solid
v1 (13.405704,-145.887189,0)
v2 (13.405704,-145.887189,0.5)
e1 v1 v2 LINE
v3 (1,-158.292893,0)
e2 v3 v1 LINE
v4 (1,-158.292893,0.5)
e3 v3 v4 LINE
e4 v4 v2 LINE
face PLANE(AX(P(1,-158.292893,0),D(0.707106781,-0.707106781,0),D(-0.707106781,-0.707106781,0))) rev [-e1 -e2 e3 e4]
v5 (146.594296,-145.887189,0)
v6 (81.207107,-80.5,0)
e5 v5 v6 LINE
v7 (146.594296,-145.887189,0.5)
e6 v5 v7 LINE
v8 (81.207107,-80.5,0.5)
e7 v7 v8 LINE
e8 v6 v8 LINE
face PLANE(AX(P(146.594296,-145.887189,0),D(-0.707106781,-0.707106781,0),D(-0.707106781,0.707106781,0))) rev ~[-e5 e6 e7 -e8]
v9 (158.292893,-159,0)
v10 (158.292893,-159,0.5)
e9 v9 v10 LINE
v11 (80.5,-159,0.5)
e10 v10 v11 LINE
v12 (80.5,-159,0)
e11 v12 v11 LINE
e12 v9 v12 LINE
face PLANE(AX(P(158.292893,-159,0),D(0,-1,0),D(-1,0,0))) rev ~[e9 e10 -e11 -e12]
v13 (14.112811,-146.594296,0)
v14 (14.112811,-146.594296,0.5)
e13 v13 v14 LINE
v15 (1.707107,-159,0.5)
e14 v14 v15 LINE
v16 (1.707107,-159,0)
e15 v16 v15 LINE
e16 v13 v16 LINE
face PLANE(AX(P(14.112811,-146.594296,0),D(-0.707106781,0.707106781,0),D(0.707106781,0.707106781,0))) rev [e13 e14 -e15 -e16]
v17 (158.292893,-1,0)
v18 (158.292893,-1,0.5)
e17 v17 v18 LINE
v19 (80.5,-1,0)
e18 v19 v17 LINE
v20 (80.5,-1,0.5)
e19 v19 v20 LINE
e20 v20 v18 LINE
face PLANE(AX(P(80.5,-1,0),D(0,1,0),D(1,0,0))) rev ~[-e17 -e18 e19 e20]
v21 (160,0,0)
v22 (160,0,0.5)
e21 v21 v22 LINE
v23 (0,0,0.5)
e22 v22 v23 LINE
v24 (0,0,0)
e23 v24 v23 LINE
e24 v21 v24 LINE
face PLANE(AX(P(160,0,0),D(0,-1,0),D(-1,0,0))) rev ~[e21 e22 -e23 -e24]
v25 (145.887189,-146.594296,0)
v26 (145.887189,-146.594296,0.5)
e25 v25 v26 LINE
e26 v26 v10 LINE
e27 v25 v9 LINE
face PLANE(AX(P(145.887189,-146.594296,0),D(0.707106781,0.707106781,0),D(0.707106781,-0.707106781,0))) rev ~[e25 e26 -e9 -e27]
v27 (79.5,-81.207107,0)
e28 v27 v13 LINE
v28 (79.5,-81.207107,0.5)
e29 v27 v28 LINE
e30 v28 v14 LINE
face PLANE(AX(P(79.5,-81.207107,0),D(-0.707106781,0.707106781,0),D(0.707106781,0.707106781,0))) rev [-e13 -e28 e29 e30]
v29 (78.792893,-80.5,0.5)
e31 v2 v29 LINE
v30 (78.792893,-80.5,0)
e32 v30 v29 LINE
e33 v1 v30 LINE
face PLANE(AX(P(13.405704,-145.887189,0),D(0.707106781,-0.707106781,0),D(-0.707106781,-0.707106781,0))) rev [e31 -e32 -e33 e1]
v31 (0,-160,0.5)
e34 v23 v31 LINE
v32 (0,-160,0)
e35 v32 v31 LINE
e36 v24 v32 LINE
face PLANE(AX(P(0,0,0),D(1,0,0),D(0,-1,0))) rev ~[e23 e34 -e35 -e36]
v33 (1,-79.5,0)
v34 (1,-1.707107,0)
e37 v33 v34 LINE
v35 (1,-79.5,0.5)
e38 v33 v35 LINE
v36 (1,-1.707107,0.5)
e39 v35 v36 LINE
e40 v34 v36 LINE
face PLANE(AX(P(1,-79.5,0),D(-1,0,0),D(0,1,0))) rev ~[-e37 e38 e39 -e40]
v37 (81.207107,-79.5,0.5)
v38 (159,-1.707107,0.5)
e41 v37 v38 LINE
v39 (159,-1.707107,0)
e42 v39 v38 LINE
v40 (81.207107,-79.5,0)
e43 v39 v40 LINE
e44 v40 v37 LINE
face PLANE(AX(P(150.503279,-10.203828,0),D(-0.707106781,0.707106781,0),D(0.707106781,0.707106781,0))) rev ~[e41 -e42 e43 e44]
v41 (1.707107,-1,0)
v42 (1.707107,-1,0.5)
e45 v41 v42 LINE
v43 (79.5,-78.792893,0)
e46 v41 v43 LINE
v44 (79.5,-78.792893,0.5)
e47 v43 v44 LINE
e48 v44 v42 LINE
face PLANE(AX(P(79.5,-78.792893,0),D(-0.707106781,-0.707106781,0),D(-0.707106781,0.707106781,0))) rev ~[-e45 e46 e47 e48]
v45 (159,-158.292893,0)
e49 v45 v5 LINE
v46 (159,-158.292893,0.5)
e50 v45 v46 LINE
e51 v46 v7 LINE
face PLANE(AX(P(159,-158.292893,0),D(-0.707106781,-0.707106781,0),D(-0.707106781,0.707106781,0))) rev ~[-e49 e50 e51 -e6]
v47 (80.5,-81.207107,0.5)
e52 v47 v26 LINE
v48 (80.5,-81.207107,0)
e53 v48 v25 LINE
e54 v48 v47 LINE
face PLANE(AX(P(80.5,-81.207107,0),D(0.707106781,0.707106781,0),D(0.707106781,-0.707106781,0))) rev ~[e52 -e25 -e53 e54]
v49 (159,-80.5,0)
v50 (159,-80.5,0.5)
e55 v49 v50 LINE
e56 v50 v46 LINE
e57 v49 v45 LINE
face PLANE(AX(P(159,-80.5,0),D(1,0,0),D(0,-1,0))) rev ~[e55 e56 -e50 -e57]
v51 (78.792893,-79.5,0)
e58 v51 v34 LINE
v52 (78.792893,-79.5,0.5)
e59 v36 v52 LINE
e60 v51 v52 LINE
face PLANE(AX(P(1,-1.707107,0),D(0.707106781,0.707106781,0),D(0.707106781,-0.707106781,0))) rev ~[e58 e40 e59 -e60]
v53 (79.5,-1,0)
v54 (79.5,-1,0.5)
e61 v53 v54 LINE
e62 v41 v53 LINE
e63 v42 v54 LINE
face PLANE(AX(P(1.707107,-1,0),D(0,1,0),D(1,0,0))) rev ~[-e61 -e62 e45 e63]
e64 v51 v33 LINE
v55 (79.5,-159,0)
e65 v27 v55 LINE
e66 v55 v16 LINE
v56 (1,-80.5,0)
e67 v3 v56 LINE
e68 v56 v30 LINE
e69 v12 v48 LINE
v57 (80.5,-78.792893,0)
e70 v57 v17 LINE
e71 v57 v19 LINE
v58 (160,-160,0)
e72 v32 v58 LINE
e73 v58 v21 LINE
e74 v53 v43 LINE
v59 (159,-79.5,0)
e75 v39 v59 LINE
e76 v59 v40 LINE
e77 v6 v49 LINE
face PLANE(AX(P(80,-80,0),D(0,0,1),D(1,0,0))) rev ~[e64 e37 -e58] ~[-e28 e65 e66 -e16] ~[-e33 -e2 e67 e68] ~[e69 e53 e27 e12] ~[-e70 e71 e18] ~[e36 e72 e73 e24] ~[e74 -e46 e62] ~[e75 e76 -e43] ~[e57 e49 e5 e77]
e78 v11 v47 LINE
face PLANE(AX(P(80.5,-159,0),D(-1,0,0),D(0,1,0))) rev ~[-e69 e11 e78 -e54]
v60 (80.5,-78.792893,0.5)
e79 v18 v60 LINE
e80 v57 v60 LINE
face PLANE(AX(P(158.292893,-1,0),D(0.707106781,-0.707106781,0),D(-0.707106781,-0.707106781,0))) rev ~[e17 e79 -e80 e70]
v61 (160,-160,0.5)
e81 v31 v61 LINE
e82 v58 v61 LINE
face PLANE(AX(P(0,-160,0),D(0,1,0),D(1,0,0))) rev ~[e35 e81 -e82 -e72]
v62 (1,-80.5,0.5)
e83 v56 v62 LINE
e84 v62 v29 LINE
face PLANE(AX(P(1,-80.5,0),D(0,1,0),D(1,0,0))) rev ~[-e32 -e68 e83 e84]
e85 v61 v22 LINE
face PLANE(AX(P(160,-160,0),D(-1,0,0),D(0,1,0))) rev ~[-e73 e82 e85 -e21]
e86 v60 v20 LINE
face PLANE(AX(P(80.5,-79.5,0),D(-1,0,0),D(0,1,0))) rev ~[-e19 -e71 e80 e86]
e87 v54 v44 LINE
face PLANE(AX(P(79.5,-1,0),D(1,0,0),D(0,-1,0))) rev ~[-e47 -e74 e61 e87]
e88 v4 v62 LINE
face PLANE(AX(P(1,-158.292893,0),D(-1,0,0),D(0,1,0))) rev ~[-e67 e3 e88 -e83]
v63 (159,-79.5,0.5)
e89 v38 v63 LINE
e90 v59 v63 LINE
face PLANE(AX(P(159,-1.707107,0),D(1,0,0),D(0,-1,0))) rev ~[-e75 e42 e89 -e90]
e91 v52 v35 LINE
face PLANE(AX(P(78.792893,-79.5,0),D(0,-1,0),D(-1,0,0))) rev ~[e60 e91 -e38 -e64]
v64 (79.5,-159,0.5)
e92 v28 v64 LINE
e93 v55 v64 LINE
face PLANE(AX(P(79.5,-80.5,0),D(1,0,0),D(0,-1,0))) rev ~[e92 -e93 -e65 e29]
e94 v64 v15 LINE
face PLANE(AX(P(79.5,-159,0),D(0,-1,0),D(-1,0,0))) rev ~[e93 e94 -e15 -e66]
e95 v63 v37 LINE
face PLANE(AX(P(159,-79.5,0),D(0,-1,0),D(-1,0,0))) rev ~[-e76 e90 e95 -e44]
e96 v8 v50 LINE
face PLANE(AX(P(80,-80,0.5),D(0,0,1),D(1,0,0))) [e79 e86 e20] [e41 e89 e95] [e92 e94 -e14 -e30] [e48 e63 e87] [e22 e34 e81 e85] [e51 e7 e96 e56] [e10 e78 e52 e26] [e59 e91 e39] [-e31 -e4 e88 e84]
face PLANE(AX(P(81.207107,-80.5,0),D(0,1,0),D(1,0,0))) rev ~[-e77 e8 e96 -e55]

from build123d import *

# Parameters (mm, degrees)
F1_DEPTH = 0.5


# Not quite as in the source:
# - a pattern or mirror of a feature is missing from the dataset's text; its kind, count and spacing are read off the source's solid


with BuildPart() as f1:
    # F0 (on Top) → F1 (new body)
    with BuildSketch(Plane.XY):
        Polygon((160, 0), (0, 0), (0, -1), (0, -160), (160, -160), align=None)
        Polygon((1, -1.7071067812), (1, -1), (1.7071067812, -1), (79.5, -1), (80, -1), (80.5, -1), (158.2928932188, -1), (159, -1), (159, -1.7071067812), (159, -79.5), (159, -80.5), (159, -158.2928932188), (159, -159), (158.2928932188, -159), (80.5, -159), (80, -159), (79.5, -159), (1.7071067812, -159), (1, -159), (1, -158.2928932188), (1, -80.5), (1, -80), (1, -79.5), align=None, mode=Mode.SUBTRACT)
        Polygon((78.7928932188, -79.5), (1, -79.5), (1, -80), (1, -80.5), (78.7928932188, -80.5), (79.2928932188, -80), align=None)
        Polygon((159, -79.5), (81.2071067812, -79.5), (80.7071067812, -80), (81.2071067812, -80.5), (159, -80.5), align=None)
        Polygon((79.5, -78.7928932188), (1.7071067812, -1), (1.3535533906, -1.3535533906), (79.5, -79.5), align=None)
        Polygon((1.3535533906, -1.3535533906), (1, -1.7071067812), (78.7928932188, -79.5), (79.5, -79.5), align=None)
        Polygon((146.2407427602, -146.2407427602), (80.5, -80.5), (80.5, -81.2071067812), (145.8871893697, -146.5942961508), align=None)
        Polygon((81.2071067812, -80.5), (80.5, -80.5), (146.2407427602, -146.2407427602), (146.5942961508, -145.8871893697), align=None)
        Polygon((80, -1), (79.5, -1), (79.5, -78.7928932188), (80, -79.2928932188), align=None)
        Polygon((80.5, -1), (80, -1), (80, -79.2928932188), (80.5, -78.7928932188), align=None)
        Polygon((80, -80.7071067812), (79.5, -81.2071067812), (79.5, -159), (80, -159), align=None)
        Polygon((80.5, -81.2071067812), (80, -80.7071067812), (80, -159), (80.5, -159), align=None)
        Polygon((146.5942961508, -145.8871893697), (146.2407427602, -146.2407427602), (158.6464466094, -158.6464466094), (159, -158.2928932188), align=None)
        Polygon((158.6464466094, -158.6464466094), (146.2407427602, -146.2407427602), (145.8871893697, -146.5942961508), (158.2928932188, -159), align=None)
        Polygon((159, -1), (158.2928932188, -1), (149.7961722435, -9.4967209753), (150.1497256341, -9.8502743659), align=None)
        Polygon((159, -1.7071067812), (159, -1), (150.1497256341, -9.8502743659), (150.5032790247, -10.2038277565), align=None)
        Polygon((80, -79.2928932188), (79.5, -78.7928932188), (79.5, -79.5), (79.7928932188, -79.5), align=None)
        Polygon((79.5, -79.5), (78.7928932188, -79.5), (79.2928932188, -80), (79.5, -79.7928932188), align=None)
        Polygon((80.5, -78.7928932188), (80, -79.2928932188), (80.2071067812, -79.5), (80.5, -79.5), align=None)
        Polygon((79.5, -80.2071067812), (79.2928932188, -80), (78.7928932188, -80.5), (79.5, -80.5), align=None)
        Polygon((80, -80), (79.6464466094, -79.6464466094), (79.5, -79.7928932188), (79.5, -80.2071067812), (79.6464466094, -80.3535533906), align=None)
        Polygon((80.3535533906, -79.6464466094), (80, -80), (80.3535533906, -80.3535533906), (80.5, -80.2071067812), (80.5, -79.7928932188), align=None)
        Polygon((81.2071067812, -79.5), (80.5, -79.5), (80.5, -79.7928932188), (80.7071067812, -80), align=None)
        Polygon((79.7928932188, -80.5), (79.5, -80.5), (79.5, -81.2071067812), (80, -80.7071067812), align=None)
        Polygon((80.5, -80.5), (80.2071067812, -80.5), (80, -80.7071067812), (80.5, -81.2071067812), align=None)
        Polygon((80.7071067812, -80), (80.5, -80.2071067812), (80.5, -80.5), (81.2071067812, -80.5), align=None)
        Polygon((1.7071067812, -1), (1, -1), (1.3535533906, -1.3535533906), align=None)
        Polygon((1.3535533906, -1.3535533906), (1, -1), (1, -1.7071067812), align=None)
        Polygon((1.3535533906, -158.6464466094), (1, -158.2928932188), (1, -159), align=None)
        Polygon((1.3535533906, -158.6464466094), (1, -159), (1.7071067812, -159), align=None)
        Polygon((159, -158.2928932188), (158.6464466094, -158.6464466094), (159, -159), align=None)
        Polygon((159, -159), (158.6464466094, -158.6464466094), (158.2928932188, -159), align=None)
        Polygon((80, -79.5), (79.7928932188, -79.5), (79.6464466094, -79.6464466094), (80, -80), align=None)
        Polygon((80.2071067812, -79.5), (80, -79.5), (80, -80), (80.3535533906, -79.6464466094), align=None)
        Polygon((80.3535533906, -80.3535533906), (80, -80), (80, -80.5), (80.2071067812, -80.5), align=None)
        Polygon((80, -80.5), (80, -80), (79.6464466094, -80.3535533906), (79.7928932188, -80.5), align=None)
        Polygon((79.5, -79.7928932188), (79.2928932188, -80), (79.5, -80.2071067812), align=None)
        Polygon((80.7071067812, -80), (80.5, -79.7928932188), (80.5, -80.2071067812), align=None)
        Polygon((79.7928932188, -79.5), (79.5, -79.5), (79.6464466094, -79.6464466094), align=None)
        Polygon((79.6464466094, -79.6464466094), (79.5, -79.5), (79.5, -79.7928932188), align=None)
        Polygon((80.2071067812, -79.5), (80, -79.2928932188), (80, -79.5), align=None)
        Polygon((80, -79.5), (80, -79.2928932188), (79.7928932188, -79.5), align=None)
        Polygon((80.5, -79.5), (80.2071067812, -79.5), (80.3535533906, -79.6464466094), align=None)
        Polygon((79.6464466094, -80.3535533906), (79.5, -80.2071067812), (79.5, -80.5), align=None)
        Polygon((80.5, -79.7928932188), (80.5, -79.5), (80.3535533906, -79.6464466094), align=None)
        Polygon((79.6464466094, -80.3535533906), (79.5, -80.5), (79.7928932188, -80.5), align=None)
        Polygon((80, -80.7071067812), (80, -80.5), (79.7928932188, -80.5), align=None)
        Polygon((80.2071067812, -80.5), (80, -80.5), (80, -80.7071067812), align=None)
        Polygon((80.5, -80.5), (80.3535533906, -80.3535533906), (80.2071067812, -80.5), align=None)
        Polygon((80.5, -80.2071067812), (80.3535533906, -80.3535533906), (80.5, -80.5), align=None)
    extrude(amount=F1_DEPTH)

    # F1_copies: F1 across plane


with BuildPart() as f1_1:
    add(f1.part)
    add(f1.part.mirror(Plane(origin=(80, 0, 0), x_dir=(0, 0, 1), z_dir=(1, 0, 0))))


solid = f1_1.part
